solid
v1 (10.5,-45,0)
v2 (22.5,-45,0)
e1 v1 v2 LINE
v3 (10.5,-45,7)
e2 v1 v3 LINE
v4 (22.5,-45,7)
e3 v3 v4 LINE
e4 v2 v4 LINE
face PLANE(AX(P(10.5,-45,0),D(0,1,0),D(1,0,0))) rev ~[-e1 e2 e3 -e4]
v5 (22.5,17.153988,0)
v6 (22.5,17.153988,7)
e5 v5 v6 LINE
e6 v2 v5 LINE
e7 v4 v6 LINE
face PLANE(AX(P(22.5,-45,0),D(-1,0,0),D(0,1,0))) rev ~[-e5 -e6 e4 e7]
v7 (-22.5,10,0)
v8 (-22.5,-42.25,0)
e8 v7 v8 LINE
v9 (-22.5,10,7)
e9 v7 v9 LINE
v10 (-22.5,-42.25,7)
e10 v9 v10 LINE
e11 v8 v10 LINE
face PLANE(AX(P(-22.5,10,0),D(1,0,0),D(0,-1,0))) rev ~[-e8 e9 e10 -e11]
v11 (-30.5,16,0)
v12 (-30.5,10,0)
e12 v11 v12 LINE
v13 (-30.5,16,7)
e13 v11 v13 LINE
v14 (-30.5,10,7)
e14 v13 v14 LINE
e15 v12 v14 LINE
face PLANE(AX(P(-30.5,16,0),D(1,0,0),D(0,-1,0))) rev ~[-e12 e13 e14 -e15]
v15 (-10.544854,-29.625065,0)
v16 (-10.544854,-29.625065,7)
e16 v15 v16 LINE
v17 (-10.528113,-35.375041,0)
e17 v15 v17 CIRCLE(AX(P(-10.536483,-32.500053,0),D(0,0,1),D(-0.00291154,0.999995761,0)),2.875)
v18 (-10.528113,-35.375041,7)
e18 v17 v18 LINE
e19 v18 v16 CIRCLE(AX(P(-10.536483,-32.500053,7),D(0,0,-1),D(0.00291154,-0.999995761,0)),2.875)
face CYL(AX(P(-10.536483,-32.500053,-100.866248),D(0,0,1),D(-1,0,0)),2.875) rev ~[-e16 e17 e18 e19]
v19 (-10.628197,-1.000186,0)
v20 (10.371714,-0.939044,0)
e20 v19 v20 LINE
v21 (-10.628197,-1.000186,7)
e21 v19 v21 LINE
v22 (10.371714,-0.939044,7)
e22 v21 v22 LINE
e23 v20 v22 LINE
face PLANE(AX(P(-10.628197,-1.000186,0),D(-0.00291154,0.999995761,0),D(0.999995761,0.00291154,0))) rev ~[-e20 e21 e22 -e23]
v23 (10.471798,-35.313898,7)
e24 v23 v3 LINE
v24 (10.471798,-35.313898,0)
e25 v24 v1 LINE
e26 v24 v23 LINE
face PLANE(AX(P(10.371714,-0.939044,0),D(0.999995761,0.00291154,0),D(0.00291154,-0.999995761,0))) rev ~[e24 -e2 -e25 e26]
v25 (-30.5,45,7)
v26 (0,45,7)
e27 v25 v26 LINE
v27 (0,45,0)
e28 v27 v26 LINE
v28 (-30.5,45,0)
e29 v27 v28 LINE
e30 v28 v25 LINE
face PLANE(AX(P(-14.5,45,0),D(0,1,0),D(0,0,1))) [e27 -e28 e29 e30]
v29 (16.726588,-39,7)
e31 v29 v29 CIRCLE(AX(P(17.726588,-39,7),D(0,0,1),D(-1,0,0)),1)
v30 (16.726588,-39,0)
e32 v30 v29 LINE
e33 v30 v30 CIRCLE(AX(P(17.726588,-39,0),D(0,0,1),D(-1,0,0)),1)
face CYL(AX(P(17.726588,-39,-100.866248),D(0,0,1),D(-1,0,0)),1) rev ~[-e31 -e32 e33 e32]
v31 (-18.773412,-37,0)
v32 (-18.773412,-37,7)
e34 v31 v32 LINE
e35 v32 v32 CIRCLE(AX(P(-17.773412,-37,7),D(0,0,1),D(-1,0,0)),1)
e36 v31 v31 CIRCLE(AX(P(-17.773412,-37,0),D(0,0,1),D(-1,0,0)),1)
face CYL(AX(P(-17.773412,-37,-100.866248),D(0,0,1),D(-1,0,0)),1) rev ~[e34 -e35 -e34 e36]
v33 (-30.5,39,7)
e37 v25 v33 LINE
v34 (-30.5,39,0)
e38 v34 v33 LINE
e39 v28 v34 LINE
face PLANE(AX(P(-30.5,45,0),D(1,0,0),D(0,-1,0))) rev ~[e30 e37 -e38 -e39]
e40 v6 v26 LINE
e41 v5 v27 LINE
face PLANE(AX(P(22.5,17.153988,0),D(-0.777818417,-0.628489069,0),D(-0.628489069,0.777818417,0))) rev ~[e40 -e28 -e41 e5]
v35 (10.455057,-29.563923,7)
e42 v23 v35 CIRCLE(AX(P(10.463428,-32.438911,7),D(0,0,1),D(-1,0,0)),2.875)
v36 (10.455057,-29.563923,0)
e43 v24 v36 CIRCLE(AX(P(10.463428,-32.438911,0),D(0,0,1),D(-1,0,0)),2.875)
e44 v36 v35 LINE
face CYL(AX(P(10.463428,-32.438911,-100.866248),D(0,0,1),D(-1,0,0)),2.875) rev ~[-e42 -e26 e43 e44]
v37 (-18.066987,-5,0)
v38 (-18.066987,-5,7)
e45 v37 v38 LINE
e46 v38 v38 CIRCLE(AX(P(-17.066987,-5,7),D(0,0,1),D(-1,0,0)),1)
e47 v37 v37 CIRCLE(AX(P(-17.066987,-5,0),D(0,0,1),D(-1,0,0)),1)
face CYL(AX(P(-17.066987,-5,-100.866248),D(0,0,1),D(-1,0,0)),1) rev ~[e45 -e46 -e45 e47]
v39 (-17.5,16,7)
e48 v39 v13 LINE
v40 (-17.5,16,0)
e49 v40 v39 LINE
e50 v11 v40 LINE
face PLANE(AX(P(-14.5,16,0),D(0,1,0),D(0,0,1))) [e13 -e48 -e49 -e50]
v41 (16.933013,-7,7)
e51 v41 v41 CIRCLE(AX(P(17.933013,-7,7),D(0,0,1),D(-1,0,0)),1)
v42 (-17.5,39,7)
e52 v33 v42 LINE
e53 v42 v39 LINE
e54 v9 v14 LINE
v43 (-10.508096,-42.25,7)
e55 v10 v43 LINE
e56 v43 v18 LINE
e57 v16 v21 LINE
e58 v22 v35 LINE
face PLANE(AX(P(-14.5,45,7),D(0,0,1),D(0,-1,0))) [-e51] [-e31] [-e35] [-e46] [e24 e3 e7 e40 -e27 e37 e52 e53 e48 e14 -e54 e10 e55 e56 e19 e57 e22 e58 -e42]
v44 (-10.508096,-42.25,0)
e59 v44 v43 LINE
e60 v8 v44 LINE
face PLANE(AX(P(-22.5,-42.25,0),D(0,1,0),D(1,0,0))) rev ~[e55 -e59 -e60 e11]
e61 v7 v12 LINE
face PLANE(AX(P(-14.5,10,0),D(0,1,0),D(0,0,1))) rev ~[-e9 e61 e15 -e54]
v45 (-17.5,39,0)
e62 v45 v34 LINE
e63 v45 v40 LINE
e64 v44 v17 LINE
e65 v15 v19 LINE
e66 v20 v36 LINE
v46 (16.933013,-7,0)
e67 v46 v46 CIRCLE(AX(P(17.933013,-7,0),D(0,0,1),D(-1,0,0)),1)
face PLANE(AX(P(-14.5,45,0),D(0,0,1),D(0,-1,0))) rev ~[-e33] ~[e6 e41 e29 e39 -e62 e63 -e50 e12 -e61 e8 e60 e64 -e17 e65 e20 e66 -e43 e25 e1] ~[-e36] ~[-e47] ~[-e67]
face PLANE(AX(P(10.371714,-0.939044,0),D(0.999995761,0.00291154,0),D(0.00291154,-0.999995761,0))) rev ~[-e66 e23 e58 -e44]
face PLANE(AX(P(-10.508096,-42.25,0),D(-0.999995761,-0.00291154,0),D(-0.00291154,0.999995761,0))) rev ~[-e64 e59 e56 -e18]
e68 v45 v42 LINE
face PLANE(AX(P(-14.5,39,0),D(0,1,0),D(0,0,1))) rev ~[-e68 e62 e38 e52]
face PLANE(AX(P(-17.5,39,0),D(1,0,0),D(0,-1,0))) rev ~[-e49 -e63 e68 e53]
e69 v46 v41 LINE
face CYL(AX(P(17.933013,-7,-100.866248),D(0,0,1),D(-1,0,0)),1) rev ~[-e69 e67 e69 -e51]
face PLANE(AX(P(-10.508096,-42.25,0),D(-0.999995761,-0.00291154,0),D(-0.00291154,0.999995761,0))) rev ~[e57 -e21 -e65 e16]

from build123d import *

# Parameters (mm, degrees)
F1_DEPTH = 7
F2_D     = 2
F3_D     = 5.75
F4_DEPTH = 16
F5_DEPTH = 5


with BuildPart() as f1:
    # F0 (on Top) → F1 (new body)
    with BuildSketch(Plane.XY):
        Polygon((10.5, -45), (22.5, -45), (22.5, 17.153987661), (0, 45), (-14.5, 45), (-14.5, 39), (-22.5, 39), (-22.5, 16), (-14.5, 16), (-14.5, 10), (-22.5, 10), (-22.5, -42.25), (-10.5080957781, -42.25), (-10.6281967604, -1.0001864958), (10.3717142302, -0.9390441602), align=None)
    extrude(amount=F1_DEPTH)

    # F2 (through all)
    with Locations(Plane(origin=(0, 0, 0), x_dir=(1, 0, 0), z_dir=(0, 0, -1))):
        with Locations((-17.0669870824, 5), (-17.7734121563, 37), (17.7265878437, 39), (17.9330129176, 7)):
            Hole(F2_D / 2)

    # F3 (through all)
    with Locations(Plane(origin=(0, 0, 0), x_dir=(1, 0, 0), z_dir=(0, 0, -1))):
        with Locations((-10.5364832571, 32.5000529818), (10.4634277335, 32.4389106462)):
            Hole(F3_D / 2)

    # F4 (add): faces of the model
    f4_faces = [f1.faces().sort_by_distance(p)[0] for p in [
        (-14.5, 42, 3.5),
        (-14.5, 13, 3.5),
    ]]
    extrude(f4_faces, amount=F4_DEPTH)

    # F5 (cut): a face of the model
    f5_faces = [f1.faces().sort_by_distance(p)[0] for p in [
        (-22.5, 27.5, 3.5),
    ]]
    extrude(f5_faces, amount=-F5_DEPTH, mode=Mode.SUBTRACT)


solid = f1.part
